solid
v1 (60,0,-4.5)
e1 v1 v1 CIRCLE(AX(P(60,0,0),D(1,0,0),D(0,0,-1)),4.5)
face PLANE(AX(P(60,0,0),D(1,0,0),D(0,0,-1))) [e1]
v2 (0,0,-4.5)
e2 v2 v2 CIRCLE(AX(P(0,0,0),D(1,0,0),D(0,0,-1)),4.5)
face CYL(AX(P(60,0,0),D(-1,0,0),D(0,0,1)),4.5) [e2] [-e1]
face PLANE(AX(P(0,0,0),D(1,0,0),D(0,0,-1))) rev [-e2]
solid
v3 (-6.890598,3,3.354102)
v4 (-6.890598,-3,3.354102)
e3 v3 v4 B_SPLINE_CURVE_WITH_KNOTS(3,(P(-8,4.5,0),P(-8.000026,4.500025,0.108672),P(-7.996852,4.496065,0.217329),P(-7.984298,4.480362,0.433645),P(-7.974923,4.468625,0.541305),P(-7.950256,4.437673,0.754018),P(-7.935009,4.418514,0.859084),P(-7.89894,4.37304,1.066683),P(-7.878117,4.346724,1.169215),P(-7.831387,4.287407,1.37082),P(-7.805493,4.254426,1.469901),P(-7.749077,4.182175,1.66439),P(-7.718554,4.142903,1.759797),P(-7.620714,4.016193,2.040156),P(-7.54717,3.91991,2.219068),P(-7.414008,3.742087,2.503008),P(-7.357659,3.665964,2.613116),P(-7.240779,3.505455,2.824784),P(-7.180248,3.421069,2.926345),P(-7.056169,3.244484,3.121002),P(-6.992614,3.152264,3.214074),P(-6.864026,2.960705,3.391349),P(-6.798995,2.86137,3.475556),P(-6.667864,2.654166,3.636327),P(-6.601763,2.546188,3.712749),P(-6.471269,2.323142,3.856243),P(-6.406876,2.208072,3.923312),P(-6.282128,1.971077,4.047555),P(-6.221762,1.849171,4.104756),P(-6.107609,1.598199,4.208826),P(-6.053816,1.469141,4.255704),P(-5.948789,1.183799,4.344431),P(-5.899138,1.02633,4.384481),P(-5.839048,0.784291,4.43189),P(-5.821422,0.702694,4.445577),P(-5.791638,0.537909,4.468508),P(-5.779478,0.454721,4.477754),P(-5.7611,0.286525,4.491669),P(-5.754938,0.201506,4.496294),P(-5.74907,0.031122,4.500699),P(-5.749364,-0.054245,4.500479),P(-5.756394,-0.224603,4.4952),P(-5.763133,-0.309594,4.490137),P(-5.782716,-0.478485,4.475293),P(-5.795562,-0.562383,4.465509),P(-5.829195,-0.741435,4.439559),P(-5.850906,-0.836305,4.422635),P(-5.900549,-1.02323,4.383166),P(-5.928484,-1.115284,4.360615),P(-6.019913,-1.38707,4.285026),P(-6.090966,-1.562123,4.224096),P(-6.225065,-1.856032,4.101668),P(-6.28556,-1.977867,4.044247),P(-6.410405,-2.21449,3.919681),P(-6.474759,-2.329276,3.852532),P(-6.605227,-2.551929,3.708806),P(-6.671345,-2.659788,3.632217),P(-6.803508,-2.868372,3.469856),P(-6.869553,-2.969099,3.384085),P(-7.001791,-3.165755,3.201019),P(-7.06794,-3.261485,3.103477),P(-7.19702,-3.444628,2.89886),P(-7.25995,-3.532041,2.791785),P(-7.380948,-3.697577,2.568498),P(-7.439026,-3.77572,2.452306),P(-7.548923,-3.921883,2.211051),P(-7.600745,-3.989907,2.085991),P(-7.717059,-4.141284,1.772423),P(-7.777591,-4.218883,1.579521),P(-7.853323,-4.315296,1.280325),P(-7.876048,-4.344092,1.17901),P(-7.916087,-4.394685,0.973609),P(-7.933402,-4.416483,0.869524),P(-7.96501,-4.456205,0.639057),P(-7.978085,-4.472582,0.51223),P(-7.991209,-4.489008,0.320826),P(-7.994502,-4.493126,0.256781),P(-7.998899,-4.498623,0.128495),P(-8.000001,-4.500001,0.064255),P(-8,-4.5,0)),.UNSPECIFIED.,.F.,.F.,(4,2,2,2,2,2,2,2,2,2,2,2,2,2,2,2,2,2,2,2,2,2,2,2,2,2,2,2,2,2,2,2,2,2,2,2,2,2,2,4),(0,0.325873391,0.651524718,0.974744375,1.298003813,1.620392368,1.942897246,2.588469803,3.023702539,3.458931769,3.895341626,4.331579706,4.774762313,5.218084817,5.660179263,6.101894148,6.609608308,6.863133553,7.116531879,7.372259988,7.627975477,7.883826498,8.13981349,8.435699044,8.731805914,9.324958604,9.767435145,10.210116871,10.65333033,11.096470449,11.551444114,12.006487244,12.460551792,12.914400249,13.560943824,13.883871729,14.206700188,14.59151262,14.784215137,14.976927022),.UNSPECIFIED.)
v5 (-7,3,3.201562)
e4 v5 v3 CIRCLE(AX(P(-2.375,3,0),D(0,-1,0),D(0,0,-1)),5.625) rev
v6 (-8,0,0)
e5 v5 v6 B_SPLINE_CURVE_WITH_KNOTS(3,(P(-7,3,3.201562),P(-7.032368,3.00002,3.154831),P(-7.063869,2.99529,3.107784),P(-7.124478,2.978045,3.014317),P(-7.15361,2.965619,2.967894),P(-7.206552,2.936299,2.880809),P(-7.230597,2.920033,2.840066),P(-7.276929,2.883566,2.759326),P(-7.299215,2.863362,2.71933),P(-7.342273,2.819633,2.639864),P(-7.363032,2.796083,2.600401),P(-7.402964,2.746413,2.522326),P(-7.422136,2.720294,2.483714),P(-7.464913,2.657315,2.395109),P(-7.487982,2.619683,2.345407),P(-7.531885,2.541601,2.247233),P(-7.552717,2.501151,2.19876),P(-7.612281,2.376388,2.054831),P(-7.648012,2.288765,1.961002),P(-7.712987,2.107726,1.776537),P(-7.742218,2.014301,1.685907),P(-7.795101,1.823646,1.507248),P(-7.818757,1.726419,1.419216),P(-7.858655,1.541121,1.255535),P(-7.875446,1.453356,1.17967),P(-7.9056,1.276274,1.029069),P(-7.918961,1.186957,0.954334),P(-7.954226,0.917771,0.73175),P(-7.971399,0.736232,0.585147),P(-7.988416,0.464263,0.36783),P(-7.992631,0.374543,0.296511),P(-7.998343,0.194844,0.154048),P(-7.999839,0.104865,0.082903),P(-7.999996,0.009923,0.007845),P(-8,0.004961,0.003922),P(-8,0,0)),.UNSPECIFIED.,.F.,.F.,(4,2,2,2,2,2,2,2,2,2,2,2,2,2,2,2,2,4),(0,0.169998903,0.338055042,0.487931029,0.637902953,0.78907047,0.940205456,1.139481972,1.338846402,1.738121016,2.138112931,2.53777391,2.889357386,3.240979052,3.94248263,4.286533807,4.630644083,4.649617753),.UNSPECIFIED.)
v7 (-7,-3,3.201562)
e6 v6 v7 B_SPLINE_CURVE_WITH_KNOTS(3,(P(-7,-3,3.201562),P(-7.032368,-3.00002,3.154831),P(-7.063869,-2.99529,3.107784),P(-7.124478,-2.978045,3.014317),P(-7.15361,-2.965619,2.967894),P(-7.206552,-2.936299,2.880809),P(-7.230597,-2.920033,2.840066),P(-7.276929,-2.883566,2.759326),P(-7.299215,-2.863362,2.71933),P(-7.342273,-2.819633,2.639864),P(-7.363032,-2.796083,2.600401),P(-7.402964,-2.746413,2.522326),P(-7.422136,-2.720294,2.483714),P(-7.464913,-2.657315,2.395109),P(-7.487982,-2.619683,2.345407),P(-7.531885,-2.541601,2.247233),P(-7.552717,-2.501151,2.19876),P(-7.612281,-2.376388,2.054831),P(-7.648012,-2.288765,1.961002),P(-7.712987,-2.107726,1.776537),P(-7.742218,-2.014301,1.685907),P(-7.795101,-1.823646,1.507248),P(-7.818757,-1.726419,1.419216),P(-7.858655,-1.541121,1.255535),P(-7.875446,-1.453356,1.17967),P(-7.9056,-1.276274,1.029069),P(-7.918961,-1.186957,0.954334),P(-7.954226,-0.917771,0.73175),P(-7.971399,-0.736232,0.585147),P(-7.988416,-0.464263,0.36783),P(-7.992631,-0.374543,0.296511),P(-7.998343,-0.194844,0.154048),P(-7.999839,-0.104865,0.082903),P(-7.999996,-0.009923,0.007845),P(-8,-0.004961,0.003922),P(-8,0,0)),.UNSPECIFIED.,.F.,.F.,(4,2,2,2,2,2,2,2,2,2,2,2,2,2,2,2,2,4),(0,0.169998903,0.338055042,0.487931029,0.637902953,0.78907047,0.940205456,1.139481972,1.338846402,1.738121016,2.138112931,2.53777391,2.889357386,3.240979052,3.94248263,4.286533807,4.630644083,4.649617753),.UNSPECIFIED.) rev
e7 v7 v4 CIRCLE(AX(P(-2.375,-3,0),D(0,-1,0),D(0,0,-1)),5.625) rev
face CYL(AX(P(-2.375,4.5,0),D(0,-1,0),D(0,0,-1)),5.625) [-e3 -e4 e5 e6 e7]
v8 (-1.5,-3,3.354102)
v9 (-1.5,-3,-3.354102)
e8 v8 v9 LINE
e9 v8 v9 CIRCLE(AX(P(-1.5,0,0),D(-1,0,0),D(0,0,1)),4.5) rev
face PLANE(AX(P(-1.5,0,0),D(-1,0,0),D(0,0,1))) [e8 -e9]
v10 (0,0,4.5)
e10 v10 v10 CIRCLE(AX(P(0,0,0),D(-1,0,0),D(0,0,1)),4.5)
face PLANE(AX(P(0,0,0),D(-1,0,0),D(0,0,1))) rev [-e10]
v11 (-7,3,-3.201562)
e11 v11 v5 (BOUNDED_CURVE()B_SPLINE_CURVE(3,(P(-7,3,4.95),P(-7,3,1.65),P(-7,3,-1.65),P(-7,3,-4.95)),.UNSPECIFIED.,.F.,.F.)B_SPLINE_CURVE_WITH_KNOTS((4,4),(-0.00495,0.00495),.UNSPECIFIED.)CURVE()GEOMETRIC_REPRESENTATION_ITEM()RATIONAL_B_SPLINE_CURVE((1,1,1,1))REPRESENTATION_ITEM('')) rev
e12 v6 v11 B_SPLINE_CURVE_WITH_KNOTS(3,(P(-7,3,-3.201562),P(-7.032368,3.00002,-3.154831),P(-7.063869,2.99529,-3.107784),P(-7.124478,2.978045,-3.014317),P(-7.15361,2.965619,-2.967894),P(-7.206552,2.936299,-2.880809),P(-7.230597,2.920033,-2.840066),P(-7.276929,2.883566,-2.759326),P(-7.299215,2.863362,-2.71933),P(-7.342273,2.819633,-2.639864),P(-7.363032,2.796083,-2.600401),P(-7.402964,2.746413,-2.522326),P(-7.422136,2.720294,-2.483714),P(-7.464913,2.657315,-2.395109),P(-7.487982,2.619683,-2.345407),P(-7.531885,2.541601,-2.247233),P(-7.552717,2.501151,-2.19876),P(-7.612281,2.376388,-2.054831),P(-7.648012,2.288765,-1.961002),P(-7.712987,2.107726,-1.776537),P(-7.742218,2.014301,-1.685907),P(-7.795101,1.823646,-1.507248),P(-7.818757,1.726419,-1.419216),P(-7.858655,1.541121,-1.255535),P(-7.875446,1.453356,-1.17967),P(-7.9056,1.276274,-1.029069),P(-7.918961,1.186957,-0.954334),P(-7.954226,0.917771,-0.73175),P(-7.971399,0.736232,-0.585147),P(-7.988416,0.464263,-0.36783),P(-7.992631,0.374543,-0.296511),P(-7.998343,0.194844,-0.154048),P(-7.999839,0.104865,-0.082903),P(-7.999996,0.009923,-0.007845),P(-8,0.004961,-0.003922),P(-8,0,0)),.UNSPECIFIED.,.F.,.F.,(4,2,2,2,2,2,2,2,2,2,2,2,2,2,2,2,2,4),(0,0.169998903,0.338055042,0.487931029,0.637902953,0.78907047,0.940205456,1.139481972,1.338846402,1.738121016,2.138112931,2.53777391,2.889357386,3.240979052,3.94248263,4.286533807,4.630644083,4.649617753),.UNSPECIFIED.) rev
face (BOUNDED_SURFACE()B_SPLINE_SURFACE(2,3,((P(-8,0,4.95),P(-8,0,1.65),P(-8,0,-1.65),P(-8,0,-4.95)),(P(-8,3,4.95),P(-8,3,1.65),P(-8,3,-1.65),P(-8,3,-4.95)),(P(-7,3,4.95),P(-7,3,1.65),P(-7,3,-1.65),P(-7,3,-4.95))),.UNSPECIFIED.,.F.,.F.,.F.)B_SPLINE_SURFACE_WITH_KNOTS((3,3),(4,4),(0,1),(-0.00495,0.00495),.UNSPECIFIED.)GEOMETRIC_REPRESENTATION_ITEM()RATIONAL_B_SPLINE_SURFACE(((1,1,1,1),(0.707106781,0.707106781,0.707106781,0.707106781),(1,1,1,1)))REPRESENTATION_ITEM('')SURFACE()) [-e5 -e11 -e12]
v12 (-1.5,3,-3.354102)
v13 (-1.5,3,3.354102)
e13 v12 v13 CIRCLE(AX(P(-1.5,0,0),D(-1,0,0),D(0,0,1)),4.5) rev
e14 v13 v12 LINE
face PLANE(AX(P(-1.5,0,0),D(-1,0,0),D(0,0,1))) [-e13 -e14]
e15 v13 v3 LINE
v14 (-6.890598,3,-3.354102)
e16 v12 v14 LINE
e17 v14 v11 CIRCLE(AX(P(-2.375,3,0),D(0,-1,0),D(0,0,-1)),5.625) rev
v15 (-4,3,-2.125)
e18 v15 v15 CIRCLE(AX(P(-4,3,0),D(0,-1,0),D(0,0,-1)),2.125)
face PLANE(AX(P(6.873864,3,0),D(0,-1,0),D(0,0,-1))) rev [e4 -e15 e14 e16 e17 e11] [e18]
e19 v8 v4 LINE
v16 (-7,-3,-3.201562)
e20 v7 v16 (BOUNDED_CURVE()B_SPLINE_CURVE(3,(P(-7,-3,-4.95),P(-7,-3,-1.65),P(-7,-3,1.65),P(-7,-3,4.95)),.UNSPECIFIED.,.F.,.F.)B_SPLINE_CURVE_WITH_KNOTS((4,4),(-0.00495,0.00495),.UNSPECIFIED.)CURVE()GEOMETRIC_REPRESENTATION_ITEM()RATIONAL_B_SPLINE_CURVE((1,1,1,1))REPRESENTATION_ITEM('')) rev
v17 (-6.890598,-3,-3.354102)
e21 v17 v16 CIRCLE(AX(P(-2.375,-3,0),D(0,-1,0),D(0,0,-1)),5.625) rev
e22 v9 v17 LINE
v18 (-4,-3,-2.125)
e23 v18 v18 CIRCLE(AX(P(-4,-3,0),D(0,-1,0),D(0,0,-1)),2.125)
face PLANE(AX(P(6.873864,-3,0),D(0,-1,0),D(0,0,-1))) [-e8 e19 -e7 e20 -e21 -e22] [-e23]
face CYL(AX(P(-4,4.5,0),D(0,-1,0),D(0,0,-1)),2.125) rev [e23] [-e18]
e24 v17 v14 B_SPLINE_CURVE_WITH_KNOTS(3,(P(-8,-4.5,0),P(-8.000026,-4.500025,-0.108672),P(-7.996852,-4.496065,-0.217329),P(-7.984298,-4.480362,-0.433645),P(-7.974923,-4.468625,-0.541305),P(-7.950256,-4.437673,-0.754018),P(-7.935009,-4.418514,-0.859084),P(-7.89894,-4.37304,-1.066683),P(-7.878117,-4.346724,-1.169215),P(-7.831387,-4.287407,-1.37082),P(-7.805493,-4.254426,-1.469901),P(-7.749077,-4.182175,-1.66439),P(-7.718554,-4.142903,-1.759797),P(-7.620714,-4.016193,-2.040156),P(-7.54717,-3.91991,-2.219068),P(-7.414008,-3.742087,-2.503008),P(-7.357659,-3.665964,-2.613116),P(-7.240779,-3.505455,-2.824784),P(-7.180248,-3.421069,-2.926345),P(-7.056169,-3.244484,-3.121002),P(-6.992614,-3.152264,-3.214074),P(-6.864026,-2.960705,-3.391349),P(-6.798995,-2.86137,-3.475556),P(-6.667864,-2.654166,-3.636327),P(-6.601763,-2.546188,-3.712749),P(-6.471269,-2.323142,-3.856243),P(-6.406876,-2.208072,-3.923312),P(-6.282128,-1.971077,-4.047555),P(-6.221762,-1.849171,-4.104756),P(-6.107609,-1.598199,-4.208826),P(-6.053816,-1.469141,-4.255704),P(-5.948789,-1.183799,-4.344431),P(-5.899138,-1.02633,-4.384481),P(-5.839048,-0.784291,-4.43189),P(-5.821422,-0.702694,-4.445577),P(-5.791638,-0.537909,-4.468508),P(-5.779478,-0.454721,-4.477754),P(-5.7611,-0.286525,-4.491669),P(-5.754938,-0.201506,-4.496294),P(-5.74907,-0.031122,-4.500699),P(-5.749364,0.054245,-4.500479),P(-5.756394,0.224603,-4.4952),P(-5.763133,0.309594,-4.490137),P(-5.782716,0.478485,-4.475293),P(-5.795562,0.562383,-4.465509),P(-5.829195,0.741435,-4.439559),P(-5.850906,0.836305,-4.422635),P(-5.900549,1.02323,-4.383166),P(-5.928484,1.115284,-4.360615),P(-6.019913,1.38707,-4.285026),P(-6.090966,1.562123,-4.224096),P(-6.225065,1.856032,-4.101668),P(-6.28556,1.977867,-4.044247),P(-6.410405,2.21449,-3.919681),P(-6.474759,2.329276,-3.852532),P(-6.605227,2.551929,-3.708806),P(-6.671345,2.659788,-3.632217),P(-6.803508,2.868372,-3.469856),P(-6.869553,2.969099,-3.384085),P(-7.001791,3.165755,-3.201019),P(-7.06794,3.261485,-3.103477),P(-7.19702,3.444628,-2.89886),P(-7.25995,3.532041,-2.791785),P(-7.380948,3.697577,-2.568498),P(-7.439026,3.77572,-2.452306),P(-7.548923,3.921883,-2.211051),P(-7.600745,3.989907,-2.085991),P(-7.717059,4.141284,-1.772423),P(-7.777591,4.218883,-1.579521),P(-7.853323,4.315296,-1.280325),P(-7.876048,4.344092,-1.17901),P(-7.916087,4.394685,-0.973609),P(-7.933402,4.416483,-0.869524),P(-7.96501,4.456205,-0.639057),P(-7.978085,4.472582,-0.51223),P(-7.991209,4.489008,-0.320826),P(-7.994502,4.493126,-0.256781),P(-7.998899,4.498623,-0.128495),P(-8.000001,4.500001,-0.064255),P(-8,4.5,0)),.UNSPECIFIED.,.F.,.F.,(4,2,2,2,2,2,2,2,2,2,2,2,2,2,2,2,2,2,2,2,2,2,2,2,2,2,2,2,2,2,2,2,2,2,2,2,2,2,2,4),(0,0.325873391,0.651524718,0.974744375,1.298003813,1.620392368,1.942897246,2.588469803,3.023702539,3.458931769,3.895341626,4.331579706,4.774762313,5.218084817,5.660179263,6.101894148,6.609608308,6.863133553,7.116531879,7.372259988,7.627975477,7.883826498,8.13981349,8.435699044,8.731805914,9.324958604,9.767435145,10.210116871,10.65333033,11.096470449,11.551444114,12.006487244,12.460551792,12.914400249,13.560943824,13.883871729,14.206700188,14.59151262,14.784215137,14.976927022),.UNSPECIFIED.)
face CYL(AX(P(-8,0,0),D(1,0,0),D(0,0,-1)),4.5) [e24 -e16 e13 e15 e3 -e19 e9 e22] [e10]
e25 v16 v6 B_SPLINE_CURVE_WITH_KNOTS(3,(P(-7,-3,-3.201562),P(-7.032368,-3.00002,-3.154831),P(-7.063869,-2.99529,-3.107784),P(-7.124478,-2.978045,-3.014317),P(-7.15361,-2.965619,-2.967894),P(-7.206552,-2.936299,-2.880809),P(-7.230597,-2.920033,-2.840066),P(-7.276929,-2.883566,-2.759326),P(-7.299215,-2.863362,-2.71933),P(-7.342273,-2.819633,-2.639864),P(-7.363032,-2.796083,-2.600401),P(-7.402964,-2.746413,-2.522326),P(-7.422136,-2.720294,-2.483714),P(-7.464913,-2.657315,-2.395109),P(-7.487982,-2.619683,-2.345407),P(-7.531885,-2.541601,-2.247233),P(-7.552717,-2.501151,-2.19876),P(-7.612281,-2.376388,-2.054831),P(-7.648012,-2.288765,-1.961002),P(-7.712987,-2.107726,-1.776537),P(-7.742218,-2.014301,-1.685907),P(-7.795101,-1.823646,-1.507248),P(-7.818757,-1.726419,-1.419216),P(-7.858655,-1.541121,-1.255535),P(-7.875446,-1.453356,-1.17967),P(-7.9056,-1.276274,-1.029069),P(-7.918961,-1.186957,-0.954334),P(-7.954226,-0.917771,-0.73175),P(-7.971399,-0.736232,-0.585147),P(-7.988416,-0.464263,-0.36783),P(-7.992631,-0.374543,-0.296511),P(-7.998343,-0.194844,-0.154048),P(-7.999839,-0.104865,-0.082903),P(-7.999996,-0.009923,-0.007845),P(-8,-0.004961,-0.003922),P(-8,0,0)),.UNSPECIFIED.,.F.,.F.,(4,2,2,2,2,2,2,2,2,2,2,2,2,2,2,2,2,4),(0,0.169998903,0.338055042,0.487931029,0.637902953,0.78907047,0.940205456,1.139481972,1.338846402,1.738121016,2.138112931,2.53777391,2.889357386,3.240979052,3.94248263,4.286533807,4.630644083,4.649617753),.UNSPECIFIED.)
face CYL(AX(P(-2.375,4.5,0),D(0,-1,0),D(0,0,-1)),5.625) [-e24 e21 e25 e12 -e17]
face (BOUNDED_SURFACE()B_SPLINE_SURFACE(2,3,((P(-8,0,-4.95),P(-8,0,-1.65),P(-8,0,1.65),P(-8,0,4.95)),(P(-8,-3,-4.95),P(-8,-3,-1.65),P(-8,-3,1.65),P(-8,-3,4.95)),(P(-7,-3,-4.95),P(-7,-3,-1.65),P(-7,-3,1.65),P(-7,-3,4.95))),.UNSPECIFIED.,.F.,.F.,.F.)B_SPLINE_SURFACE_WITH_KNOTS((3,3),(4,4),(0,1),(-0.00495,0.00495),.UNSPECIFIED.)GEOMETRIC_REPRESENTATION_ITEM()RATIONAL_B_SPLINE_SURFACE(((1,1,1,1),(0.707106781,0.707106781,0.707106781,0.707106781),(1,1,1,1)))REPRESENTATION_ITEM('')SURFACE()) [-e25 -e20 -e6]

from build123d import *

# Parameters (mm, degrees)
SKETCH2_R               = 4.5
BOSS_EXTRUDE1_DEPTH     = 60
SKETCH3_R               = 4.5
BOSS_EXTRUDE2_DEPTH     = 8
CUT_EXTRUDE1_DEPTH      = 6.5
SKETCH5_R               = 2.125
CUT_EXTRUDE2_DEPTH      = 61.634148794
FILLET2_SIZE            = 3
FILLET2_SIZE_2          = 1
FILLET3_SIZE            = 3
FILLET3_SIZE_2          = 1
CUT_EXTRUDE5_DEPTH      = 61.634148814
CUT_EXTRUDE5_DEPTH_BACK = 61.634148814


with BuildPart() as part:
    # Sketch2 → Boss-Extrude1 (new body)
    with BuildSketch(Plane(origin=(0, 0, 0), x_dir=(0, 0, -1), z_dir=(1, 0, 0))):
        Circle(SKETCH2_R)
    extrude(amount=BOSS_EXTRUDE1_DEPTH)


with BuildPart() as body_2:
    # Sketch3 → Boss-Extrude2 (new body)
    with BuildSketch(Plane.ZY):
        Circle(SKETCH3_R)
    extrude(amount=BOSS_EXTRUDE2_DEPTH)

    # Sketch4 → Cut-Extrude1 (cut)
    with BuildSketch(Plane.ZY.offset(8)):
        with BuildLine():
            ThreePointArc((3.354101966, 3), (0, 4.5), (-3.354101966, 3))
            Line((-3.354101966, 3), (3.354101966, 3))
        make_face()
        with BuildLine():
            Line((3.354101966, -3), (-3.354101966, -3))
            ThreePointArc((-3.354101966, -3), (0, -4.5), (3.354101966, -3))
        make_face()
    extrude(amount=-CUT_EXTRUDE1_DEPTH, mode=Mode.SUBTRACT)

    # Sketch5 → Cut-Extrude2 (cut, through all)
    with BuildSketch(Plane.XZ.offset(3)):
        with Locations(Location((-4, 0, 0), (0, 0, 270))):
            Circle(SKETCH5_R)
    extrude(amount=-CUT_EXTRUDE2_DEPTH, mode=Mode.SUBTRACT)

    # Fillet2
    # an asymmetric fillet: 3, 1 mm, written as the material it takes off along each edge
    with BuildSketch(Plane(origin=(-8, -3, 10.854101966), x_dir=(0, 1, 0), z_dir=(0, 0, -1))) as fillet2_piece_1:
        with BuildLine():
            Bezier((FILLET2_SIZE, 0), (0, 0), (0, FILLET2_SIZE_2), weights=[1, 0.707106781, 1])
            Line((0, FILLET2_SIZE_2), (0, 0))
            Line((0, 0), (FILLET2_SIZE, 0))
        make_face()
    extrude(amount=21.708203932, mode=Mode.SUBTRACT)

    # Fillet3
    # an asymmetric fillet: 3, 1 mm, written as the material it takes off along each edge
    with BuildSketch(Plane(origin=(-8, 3, -10.854101966), x_dir=(0, -1, 0), z_dir=(0, 0, 1))) as fillet3_piece_1:
        with BuildLine():
            Bezier((FILLET3_SIZE, 0), (0, 0), (0, FILLET3_SIZE_2), weights=[1, 0.707106781, 1])
            Line((0, FILLET3_SIZE_2), (0, 0))
            Line((0, 0), (FILLET3_SIZE, 0))
        make_face()
    extrude(amount=21.708203932, mode=Mode.SUBTRACT)

    # Sketch8 → Cut-Extrude5 (cut, two sides: drawn at the far end of the back side and taken through both)
    with BuildSketch(Plane.XZ.offset(3).offset(-CUT_EXTRUDE5_DEPTH_BACK)):
        with BuildLine():
            Line((-7, -3.354101966), (-6.890597967, -3.354101966))
            ThreePointArc((-6.890597967, -3.354101966), (-6.945935342, -3.278288441), (-7, -3.201562119))
            Line((-7, -3.201562119), (-7, -3.354101966))
        make_face()
        with BuildLine():
            Line((-8, -4.5), (-5.75, -4.5))
            ThreePointArc((-5.75, -4.5), (-6.361684668, -3.968245249), (-6.890597967, -3.354101966))
            Line((-6.890597967, -3.354101966), (-7, -3.354101966))
            Line((-7, -3.354101966), (-7, -3.201562119))
            ThreePointArc((-7, -3.201562119), (-7.744182899, -1.677050983), (-8, 0))
            Line((-8, 0), (-8, -4.5))
        make_face()
        with BuildLine():
            Line((-7, 3.354101966), (-7, 3.201562119))
            ThreePointArc((-7, 3.201562119), (-6.945935342, 3.278288441), (-6.890597967, 3.354101966))
            Line((-6.890597967, 3.354101966), (-7, 3.354101966))
        make_face()
        with BuildLine():
            Line((-8, 4.5), (-8, 0))
            ThreePointArc((-8, 0), (-7.744182899, 1.677050983), (-7, 3.201562119))
            Line((-7, 3.201562119), (-7, 3.354101966))
            Line((-7, 3.354101966), (-6.890597967, 3.354101966))
            ThreePointArc((-6.890597967, 3.354101966), (-6.361684668, 3.968245249), (-5.75, 4.5))
            Line((-5.75, 4.5), (-8, 4.5))
        make_face()
    extrude(amount=CUT_EXTRUDE5_DEPTH + CUT_EXTRUDE5_DEPTH_BACK, mode=Mode.SUBTRACT)


solid = Compound([part.part, body_2.part])
